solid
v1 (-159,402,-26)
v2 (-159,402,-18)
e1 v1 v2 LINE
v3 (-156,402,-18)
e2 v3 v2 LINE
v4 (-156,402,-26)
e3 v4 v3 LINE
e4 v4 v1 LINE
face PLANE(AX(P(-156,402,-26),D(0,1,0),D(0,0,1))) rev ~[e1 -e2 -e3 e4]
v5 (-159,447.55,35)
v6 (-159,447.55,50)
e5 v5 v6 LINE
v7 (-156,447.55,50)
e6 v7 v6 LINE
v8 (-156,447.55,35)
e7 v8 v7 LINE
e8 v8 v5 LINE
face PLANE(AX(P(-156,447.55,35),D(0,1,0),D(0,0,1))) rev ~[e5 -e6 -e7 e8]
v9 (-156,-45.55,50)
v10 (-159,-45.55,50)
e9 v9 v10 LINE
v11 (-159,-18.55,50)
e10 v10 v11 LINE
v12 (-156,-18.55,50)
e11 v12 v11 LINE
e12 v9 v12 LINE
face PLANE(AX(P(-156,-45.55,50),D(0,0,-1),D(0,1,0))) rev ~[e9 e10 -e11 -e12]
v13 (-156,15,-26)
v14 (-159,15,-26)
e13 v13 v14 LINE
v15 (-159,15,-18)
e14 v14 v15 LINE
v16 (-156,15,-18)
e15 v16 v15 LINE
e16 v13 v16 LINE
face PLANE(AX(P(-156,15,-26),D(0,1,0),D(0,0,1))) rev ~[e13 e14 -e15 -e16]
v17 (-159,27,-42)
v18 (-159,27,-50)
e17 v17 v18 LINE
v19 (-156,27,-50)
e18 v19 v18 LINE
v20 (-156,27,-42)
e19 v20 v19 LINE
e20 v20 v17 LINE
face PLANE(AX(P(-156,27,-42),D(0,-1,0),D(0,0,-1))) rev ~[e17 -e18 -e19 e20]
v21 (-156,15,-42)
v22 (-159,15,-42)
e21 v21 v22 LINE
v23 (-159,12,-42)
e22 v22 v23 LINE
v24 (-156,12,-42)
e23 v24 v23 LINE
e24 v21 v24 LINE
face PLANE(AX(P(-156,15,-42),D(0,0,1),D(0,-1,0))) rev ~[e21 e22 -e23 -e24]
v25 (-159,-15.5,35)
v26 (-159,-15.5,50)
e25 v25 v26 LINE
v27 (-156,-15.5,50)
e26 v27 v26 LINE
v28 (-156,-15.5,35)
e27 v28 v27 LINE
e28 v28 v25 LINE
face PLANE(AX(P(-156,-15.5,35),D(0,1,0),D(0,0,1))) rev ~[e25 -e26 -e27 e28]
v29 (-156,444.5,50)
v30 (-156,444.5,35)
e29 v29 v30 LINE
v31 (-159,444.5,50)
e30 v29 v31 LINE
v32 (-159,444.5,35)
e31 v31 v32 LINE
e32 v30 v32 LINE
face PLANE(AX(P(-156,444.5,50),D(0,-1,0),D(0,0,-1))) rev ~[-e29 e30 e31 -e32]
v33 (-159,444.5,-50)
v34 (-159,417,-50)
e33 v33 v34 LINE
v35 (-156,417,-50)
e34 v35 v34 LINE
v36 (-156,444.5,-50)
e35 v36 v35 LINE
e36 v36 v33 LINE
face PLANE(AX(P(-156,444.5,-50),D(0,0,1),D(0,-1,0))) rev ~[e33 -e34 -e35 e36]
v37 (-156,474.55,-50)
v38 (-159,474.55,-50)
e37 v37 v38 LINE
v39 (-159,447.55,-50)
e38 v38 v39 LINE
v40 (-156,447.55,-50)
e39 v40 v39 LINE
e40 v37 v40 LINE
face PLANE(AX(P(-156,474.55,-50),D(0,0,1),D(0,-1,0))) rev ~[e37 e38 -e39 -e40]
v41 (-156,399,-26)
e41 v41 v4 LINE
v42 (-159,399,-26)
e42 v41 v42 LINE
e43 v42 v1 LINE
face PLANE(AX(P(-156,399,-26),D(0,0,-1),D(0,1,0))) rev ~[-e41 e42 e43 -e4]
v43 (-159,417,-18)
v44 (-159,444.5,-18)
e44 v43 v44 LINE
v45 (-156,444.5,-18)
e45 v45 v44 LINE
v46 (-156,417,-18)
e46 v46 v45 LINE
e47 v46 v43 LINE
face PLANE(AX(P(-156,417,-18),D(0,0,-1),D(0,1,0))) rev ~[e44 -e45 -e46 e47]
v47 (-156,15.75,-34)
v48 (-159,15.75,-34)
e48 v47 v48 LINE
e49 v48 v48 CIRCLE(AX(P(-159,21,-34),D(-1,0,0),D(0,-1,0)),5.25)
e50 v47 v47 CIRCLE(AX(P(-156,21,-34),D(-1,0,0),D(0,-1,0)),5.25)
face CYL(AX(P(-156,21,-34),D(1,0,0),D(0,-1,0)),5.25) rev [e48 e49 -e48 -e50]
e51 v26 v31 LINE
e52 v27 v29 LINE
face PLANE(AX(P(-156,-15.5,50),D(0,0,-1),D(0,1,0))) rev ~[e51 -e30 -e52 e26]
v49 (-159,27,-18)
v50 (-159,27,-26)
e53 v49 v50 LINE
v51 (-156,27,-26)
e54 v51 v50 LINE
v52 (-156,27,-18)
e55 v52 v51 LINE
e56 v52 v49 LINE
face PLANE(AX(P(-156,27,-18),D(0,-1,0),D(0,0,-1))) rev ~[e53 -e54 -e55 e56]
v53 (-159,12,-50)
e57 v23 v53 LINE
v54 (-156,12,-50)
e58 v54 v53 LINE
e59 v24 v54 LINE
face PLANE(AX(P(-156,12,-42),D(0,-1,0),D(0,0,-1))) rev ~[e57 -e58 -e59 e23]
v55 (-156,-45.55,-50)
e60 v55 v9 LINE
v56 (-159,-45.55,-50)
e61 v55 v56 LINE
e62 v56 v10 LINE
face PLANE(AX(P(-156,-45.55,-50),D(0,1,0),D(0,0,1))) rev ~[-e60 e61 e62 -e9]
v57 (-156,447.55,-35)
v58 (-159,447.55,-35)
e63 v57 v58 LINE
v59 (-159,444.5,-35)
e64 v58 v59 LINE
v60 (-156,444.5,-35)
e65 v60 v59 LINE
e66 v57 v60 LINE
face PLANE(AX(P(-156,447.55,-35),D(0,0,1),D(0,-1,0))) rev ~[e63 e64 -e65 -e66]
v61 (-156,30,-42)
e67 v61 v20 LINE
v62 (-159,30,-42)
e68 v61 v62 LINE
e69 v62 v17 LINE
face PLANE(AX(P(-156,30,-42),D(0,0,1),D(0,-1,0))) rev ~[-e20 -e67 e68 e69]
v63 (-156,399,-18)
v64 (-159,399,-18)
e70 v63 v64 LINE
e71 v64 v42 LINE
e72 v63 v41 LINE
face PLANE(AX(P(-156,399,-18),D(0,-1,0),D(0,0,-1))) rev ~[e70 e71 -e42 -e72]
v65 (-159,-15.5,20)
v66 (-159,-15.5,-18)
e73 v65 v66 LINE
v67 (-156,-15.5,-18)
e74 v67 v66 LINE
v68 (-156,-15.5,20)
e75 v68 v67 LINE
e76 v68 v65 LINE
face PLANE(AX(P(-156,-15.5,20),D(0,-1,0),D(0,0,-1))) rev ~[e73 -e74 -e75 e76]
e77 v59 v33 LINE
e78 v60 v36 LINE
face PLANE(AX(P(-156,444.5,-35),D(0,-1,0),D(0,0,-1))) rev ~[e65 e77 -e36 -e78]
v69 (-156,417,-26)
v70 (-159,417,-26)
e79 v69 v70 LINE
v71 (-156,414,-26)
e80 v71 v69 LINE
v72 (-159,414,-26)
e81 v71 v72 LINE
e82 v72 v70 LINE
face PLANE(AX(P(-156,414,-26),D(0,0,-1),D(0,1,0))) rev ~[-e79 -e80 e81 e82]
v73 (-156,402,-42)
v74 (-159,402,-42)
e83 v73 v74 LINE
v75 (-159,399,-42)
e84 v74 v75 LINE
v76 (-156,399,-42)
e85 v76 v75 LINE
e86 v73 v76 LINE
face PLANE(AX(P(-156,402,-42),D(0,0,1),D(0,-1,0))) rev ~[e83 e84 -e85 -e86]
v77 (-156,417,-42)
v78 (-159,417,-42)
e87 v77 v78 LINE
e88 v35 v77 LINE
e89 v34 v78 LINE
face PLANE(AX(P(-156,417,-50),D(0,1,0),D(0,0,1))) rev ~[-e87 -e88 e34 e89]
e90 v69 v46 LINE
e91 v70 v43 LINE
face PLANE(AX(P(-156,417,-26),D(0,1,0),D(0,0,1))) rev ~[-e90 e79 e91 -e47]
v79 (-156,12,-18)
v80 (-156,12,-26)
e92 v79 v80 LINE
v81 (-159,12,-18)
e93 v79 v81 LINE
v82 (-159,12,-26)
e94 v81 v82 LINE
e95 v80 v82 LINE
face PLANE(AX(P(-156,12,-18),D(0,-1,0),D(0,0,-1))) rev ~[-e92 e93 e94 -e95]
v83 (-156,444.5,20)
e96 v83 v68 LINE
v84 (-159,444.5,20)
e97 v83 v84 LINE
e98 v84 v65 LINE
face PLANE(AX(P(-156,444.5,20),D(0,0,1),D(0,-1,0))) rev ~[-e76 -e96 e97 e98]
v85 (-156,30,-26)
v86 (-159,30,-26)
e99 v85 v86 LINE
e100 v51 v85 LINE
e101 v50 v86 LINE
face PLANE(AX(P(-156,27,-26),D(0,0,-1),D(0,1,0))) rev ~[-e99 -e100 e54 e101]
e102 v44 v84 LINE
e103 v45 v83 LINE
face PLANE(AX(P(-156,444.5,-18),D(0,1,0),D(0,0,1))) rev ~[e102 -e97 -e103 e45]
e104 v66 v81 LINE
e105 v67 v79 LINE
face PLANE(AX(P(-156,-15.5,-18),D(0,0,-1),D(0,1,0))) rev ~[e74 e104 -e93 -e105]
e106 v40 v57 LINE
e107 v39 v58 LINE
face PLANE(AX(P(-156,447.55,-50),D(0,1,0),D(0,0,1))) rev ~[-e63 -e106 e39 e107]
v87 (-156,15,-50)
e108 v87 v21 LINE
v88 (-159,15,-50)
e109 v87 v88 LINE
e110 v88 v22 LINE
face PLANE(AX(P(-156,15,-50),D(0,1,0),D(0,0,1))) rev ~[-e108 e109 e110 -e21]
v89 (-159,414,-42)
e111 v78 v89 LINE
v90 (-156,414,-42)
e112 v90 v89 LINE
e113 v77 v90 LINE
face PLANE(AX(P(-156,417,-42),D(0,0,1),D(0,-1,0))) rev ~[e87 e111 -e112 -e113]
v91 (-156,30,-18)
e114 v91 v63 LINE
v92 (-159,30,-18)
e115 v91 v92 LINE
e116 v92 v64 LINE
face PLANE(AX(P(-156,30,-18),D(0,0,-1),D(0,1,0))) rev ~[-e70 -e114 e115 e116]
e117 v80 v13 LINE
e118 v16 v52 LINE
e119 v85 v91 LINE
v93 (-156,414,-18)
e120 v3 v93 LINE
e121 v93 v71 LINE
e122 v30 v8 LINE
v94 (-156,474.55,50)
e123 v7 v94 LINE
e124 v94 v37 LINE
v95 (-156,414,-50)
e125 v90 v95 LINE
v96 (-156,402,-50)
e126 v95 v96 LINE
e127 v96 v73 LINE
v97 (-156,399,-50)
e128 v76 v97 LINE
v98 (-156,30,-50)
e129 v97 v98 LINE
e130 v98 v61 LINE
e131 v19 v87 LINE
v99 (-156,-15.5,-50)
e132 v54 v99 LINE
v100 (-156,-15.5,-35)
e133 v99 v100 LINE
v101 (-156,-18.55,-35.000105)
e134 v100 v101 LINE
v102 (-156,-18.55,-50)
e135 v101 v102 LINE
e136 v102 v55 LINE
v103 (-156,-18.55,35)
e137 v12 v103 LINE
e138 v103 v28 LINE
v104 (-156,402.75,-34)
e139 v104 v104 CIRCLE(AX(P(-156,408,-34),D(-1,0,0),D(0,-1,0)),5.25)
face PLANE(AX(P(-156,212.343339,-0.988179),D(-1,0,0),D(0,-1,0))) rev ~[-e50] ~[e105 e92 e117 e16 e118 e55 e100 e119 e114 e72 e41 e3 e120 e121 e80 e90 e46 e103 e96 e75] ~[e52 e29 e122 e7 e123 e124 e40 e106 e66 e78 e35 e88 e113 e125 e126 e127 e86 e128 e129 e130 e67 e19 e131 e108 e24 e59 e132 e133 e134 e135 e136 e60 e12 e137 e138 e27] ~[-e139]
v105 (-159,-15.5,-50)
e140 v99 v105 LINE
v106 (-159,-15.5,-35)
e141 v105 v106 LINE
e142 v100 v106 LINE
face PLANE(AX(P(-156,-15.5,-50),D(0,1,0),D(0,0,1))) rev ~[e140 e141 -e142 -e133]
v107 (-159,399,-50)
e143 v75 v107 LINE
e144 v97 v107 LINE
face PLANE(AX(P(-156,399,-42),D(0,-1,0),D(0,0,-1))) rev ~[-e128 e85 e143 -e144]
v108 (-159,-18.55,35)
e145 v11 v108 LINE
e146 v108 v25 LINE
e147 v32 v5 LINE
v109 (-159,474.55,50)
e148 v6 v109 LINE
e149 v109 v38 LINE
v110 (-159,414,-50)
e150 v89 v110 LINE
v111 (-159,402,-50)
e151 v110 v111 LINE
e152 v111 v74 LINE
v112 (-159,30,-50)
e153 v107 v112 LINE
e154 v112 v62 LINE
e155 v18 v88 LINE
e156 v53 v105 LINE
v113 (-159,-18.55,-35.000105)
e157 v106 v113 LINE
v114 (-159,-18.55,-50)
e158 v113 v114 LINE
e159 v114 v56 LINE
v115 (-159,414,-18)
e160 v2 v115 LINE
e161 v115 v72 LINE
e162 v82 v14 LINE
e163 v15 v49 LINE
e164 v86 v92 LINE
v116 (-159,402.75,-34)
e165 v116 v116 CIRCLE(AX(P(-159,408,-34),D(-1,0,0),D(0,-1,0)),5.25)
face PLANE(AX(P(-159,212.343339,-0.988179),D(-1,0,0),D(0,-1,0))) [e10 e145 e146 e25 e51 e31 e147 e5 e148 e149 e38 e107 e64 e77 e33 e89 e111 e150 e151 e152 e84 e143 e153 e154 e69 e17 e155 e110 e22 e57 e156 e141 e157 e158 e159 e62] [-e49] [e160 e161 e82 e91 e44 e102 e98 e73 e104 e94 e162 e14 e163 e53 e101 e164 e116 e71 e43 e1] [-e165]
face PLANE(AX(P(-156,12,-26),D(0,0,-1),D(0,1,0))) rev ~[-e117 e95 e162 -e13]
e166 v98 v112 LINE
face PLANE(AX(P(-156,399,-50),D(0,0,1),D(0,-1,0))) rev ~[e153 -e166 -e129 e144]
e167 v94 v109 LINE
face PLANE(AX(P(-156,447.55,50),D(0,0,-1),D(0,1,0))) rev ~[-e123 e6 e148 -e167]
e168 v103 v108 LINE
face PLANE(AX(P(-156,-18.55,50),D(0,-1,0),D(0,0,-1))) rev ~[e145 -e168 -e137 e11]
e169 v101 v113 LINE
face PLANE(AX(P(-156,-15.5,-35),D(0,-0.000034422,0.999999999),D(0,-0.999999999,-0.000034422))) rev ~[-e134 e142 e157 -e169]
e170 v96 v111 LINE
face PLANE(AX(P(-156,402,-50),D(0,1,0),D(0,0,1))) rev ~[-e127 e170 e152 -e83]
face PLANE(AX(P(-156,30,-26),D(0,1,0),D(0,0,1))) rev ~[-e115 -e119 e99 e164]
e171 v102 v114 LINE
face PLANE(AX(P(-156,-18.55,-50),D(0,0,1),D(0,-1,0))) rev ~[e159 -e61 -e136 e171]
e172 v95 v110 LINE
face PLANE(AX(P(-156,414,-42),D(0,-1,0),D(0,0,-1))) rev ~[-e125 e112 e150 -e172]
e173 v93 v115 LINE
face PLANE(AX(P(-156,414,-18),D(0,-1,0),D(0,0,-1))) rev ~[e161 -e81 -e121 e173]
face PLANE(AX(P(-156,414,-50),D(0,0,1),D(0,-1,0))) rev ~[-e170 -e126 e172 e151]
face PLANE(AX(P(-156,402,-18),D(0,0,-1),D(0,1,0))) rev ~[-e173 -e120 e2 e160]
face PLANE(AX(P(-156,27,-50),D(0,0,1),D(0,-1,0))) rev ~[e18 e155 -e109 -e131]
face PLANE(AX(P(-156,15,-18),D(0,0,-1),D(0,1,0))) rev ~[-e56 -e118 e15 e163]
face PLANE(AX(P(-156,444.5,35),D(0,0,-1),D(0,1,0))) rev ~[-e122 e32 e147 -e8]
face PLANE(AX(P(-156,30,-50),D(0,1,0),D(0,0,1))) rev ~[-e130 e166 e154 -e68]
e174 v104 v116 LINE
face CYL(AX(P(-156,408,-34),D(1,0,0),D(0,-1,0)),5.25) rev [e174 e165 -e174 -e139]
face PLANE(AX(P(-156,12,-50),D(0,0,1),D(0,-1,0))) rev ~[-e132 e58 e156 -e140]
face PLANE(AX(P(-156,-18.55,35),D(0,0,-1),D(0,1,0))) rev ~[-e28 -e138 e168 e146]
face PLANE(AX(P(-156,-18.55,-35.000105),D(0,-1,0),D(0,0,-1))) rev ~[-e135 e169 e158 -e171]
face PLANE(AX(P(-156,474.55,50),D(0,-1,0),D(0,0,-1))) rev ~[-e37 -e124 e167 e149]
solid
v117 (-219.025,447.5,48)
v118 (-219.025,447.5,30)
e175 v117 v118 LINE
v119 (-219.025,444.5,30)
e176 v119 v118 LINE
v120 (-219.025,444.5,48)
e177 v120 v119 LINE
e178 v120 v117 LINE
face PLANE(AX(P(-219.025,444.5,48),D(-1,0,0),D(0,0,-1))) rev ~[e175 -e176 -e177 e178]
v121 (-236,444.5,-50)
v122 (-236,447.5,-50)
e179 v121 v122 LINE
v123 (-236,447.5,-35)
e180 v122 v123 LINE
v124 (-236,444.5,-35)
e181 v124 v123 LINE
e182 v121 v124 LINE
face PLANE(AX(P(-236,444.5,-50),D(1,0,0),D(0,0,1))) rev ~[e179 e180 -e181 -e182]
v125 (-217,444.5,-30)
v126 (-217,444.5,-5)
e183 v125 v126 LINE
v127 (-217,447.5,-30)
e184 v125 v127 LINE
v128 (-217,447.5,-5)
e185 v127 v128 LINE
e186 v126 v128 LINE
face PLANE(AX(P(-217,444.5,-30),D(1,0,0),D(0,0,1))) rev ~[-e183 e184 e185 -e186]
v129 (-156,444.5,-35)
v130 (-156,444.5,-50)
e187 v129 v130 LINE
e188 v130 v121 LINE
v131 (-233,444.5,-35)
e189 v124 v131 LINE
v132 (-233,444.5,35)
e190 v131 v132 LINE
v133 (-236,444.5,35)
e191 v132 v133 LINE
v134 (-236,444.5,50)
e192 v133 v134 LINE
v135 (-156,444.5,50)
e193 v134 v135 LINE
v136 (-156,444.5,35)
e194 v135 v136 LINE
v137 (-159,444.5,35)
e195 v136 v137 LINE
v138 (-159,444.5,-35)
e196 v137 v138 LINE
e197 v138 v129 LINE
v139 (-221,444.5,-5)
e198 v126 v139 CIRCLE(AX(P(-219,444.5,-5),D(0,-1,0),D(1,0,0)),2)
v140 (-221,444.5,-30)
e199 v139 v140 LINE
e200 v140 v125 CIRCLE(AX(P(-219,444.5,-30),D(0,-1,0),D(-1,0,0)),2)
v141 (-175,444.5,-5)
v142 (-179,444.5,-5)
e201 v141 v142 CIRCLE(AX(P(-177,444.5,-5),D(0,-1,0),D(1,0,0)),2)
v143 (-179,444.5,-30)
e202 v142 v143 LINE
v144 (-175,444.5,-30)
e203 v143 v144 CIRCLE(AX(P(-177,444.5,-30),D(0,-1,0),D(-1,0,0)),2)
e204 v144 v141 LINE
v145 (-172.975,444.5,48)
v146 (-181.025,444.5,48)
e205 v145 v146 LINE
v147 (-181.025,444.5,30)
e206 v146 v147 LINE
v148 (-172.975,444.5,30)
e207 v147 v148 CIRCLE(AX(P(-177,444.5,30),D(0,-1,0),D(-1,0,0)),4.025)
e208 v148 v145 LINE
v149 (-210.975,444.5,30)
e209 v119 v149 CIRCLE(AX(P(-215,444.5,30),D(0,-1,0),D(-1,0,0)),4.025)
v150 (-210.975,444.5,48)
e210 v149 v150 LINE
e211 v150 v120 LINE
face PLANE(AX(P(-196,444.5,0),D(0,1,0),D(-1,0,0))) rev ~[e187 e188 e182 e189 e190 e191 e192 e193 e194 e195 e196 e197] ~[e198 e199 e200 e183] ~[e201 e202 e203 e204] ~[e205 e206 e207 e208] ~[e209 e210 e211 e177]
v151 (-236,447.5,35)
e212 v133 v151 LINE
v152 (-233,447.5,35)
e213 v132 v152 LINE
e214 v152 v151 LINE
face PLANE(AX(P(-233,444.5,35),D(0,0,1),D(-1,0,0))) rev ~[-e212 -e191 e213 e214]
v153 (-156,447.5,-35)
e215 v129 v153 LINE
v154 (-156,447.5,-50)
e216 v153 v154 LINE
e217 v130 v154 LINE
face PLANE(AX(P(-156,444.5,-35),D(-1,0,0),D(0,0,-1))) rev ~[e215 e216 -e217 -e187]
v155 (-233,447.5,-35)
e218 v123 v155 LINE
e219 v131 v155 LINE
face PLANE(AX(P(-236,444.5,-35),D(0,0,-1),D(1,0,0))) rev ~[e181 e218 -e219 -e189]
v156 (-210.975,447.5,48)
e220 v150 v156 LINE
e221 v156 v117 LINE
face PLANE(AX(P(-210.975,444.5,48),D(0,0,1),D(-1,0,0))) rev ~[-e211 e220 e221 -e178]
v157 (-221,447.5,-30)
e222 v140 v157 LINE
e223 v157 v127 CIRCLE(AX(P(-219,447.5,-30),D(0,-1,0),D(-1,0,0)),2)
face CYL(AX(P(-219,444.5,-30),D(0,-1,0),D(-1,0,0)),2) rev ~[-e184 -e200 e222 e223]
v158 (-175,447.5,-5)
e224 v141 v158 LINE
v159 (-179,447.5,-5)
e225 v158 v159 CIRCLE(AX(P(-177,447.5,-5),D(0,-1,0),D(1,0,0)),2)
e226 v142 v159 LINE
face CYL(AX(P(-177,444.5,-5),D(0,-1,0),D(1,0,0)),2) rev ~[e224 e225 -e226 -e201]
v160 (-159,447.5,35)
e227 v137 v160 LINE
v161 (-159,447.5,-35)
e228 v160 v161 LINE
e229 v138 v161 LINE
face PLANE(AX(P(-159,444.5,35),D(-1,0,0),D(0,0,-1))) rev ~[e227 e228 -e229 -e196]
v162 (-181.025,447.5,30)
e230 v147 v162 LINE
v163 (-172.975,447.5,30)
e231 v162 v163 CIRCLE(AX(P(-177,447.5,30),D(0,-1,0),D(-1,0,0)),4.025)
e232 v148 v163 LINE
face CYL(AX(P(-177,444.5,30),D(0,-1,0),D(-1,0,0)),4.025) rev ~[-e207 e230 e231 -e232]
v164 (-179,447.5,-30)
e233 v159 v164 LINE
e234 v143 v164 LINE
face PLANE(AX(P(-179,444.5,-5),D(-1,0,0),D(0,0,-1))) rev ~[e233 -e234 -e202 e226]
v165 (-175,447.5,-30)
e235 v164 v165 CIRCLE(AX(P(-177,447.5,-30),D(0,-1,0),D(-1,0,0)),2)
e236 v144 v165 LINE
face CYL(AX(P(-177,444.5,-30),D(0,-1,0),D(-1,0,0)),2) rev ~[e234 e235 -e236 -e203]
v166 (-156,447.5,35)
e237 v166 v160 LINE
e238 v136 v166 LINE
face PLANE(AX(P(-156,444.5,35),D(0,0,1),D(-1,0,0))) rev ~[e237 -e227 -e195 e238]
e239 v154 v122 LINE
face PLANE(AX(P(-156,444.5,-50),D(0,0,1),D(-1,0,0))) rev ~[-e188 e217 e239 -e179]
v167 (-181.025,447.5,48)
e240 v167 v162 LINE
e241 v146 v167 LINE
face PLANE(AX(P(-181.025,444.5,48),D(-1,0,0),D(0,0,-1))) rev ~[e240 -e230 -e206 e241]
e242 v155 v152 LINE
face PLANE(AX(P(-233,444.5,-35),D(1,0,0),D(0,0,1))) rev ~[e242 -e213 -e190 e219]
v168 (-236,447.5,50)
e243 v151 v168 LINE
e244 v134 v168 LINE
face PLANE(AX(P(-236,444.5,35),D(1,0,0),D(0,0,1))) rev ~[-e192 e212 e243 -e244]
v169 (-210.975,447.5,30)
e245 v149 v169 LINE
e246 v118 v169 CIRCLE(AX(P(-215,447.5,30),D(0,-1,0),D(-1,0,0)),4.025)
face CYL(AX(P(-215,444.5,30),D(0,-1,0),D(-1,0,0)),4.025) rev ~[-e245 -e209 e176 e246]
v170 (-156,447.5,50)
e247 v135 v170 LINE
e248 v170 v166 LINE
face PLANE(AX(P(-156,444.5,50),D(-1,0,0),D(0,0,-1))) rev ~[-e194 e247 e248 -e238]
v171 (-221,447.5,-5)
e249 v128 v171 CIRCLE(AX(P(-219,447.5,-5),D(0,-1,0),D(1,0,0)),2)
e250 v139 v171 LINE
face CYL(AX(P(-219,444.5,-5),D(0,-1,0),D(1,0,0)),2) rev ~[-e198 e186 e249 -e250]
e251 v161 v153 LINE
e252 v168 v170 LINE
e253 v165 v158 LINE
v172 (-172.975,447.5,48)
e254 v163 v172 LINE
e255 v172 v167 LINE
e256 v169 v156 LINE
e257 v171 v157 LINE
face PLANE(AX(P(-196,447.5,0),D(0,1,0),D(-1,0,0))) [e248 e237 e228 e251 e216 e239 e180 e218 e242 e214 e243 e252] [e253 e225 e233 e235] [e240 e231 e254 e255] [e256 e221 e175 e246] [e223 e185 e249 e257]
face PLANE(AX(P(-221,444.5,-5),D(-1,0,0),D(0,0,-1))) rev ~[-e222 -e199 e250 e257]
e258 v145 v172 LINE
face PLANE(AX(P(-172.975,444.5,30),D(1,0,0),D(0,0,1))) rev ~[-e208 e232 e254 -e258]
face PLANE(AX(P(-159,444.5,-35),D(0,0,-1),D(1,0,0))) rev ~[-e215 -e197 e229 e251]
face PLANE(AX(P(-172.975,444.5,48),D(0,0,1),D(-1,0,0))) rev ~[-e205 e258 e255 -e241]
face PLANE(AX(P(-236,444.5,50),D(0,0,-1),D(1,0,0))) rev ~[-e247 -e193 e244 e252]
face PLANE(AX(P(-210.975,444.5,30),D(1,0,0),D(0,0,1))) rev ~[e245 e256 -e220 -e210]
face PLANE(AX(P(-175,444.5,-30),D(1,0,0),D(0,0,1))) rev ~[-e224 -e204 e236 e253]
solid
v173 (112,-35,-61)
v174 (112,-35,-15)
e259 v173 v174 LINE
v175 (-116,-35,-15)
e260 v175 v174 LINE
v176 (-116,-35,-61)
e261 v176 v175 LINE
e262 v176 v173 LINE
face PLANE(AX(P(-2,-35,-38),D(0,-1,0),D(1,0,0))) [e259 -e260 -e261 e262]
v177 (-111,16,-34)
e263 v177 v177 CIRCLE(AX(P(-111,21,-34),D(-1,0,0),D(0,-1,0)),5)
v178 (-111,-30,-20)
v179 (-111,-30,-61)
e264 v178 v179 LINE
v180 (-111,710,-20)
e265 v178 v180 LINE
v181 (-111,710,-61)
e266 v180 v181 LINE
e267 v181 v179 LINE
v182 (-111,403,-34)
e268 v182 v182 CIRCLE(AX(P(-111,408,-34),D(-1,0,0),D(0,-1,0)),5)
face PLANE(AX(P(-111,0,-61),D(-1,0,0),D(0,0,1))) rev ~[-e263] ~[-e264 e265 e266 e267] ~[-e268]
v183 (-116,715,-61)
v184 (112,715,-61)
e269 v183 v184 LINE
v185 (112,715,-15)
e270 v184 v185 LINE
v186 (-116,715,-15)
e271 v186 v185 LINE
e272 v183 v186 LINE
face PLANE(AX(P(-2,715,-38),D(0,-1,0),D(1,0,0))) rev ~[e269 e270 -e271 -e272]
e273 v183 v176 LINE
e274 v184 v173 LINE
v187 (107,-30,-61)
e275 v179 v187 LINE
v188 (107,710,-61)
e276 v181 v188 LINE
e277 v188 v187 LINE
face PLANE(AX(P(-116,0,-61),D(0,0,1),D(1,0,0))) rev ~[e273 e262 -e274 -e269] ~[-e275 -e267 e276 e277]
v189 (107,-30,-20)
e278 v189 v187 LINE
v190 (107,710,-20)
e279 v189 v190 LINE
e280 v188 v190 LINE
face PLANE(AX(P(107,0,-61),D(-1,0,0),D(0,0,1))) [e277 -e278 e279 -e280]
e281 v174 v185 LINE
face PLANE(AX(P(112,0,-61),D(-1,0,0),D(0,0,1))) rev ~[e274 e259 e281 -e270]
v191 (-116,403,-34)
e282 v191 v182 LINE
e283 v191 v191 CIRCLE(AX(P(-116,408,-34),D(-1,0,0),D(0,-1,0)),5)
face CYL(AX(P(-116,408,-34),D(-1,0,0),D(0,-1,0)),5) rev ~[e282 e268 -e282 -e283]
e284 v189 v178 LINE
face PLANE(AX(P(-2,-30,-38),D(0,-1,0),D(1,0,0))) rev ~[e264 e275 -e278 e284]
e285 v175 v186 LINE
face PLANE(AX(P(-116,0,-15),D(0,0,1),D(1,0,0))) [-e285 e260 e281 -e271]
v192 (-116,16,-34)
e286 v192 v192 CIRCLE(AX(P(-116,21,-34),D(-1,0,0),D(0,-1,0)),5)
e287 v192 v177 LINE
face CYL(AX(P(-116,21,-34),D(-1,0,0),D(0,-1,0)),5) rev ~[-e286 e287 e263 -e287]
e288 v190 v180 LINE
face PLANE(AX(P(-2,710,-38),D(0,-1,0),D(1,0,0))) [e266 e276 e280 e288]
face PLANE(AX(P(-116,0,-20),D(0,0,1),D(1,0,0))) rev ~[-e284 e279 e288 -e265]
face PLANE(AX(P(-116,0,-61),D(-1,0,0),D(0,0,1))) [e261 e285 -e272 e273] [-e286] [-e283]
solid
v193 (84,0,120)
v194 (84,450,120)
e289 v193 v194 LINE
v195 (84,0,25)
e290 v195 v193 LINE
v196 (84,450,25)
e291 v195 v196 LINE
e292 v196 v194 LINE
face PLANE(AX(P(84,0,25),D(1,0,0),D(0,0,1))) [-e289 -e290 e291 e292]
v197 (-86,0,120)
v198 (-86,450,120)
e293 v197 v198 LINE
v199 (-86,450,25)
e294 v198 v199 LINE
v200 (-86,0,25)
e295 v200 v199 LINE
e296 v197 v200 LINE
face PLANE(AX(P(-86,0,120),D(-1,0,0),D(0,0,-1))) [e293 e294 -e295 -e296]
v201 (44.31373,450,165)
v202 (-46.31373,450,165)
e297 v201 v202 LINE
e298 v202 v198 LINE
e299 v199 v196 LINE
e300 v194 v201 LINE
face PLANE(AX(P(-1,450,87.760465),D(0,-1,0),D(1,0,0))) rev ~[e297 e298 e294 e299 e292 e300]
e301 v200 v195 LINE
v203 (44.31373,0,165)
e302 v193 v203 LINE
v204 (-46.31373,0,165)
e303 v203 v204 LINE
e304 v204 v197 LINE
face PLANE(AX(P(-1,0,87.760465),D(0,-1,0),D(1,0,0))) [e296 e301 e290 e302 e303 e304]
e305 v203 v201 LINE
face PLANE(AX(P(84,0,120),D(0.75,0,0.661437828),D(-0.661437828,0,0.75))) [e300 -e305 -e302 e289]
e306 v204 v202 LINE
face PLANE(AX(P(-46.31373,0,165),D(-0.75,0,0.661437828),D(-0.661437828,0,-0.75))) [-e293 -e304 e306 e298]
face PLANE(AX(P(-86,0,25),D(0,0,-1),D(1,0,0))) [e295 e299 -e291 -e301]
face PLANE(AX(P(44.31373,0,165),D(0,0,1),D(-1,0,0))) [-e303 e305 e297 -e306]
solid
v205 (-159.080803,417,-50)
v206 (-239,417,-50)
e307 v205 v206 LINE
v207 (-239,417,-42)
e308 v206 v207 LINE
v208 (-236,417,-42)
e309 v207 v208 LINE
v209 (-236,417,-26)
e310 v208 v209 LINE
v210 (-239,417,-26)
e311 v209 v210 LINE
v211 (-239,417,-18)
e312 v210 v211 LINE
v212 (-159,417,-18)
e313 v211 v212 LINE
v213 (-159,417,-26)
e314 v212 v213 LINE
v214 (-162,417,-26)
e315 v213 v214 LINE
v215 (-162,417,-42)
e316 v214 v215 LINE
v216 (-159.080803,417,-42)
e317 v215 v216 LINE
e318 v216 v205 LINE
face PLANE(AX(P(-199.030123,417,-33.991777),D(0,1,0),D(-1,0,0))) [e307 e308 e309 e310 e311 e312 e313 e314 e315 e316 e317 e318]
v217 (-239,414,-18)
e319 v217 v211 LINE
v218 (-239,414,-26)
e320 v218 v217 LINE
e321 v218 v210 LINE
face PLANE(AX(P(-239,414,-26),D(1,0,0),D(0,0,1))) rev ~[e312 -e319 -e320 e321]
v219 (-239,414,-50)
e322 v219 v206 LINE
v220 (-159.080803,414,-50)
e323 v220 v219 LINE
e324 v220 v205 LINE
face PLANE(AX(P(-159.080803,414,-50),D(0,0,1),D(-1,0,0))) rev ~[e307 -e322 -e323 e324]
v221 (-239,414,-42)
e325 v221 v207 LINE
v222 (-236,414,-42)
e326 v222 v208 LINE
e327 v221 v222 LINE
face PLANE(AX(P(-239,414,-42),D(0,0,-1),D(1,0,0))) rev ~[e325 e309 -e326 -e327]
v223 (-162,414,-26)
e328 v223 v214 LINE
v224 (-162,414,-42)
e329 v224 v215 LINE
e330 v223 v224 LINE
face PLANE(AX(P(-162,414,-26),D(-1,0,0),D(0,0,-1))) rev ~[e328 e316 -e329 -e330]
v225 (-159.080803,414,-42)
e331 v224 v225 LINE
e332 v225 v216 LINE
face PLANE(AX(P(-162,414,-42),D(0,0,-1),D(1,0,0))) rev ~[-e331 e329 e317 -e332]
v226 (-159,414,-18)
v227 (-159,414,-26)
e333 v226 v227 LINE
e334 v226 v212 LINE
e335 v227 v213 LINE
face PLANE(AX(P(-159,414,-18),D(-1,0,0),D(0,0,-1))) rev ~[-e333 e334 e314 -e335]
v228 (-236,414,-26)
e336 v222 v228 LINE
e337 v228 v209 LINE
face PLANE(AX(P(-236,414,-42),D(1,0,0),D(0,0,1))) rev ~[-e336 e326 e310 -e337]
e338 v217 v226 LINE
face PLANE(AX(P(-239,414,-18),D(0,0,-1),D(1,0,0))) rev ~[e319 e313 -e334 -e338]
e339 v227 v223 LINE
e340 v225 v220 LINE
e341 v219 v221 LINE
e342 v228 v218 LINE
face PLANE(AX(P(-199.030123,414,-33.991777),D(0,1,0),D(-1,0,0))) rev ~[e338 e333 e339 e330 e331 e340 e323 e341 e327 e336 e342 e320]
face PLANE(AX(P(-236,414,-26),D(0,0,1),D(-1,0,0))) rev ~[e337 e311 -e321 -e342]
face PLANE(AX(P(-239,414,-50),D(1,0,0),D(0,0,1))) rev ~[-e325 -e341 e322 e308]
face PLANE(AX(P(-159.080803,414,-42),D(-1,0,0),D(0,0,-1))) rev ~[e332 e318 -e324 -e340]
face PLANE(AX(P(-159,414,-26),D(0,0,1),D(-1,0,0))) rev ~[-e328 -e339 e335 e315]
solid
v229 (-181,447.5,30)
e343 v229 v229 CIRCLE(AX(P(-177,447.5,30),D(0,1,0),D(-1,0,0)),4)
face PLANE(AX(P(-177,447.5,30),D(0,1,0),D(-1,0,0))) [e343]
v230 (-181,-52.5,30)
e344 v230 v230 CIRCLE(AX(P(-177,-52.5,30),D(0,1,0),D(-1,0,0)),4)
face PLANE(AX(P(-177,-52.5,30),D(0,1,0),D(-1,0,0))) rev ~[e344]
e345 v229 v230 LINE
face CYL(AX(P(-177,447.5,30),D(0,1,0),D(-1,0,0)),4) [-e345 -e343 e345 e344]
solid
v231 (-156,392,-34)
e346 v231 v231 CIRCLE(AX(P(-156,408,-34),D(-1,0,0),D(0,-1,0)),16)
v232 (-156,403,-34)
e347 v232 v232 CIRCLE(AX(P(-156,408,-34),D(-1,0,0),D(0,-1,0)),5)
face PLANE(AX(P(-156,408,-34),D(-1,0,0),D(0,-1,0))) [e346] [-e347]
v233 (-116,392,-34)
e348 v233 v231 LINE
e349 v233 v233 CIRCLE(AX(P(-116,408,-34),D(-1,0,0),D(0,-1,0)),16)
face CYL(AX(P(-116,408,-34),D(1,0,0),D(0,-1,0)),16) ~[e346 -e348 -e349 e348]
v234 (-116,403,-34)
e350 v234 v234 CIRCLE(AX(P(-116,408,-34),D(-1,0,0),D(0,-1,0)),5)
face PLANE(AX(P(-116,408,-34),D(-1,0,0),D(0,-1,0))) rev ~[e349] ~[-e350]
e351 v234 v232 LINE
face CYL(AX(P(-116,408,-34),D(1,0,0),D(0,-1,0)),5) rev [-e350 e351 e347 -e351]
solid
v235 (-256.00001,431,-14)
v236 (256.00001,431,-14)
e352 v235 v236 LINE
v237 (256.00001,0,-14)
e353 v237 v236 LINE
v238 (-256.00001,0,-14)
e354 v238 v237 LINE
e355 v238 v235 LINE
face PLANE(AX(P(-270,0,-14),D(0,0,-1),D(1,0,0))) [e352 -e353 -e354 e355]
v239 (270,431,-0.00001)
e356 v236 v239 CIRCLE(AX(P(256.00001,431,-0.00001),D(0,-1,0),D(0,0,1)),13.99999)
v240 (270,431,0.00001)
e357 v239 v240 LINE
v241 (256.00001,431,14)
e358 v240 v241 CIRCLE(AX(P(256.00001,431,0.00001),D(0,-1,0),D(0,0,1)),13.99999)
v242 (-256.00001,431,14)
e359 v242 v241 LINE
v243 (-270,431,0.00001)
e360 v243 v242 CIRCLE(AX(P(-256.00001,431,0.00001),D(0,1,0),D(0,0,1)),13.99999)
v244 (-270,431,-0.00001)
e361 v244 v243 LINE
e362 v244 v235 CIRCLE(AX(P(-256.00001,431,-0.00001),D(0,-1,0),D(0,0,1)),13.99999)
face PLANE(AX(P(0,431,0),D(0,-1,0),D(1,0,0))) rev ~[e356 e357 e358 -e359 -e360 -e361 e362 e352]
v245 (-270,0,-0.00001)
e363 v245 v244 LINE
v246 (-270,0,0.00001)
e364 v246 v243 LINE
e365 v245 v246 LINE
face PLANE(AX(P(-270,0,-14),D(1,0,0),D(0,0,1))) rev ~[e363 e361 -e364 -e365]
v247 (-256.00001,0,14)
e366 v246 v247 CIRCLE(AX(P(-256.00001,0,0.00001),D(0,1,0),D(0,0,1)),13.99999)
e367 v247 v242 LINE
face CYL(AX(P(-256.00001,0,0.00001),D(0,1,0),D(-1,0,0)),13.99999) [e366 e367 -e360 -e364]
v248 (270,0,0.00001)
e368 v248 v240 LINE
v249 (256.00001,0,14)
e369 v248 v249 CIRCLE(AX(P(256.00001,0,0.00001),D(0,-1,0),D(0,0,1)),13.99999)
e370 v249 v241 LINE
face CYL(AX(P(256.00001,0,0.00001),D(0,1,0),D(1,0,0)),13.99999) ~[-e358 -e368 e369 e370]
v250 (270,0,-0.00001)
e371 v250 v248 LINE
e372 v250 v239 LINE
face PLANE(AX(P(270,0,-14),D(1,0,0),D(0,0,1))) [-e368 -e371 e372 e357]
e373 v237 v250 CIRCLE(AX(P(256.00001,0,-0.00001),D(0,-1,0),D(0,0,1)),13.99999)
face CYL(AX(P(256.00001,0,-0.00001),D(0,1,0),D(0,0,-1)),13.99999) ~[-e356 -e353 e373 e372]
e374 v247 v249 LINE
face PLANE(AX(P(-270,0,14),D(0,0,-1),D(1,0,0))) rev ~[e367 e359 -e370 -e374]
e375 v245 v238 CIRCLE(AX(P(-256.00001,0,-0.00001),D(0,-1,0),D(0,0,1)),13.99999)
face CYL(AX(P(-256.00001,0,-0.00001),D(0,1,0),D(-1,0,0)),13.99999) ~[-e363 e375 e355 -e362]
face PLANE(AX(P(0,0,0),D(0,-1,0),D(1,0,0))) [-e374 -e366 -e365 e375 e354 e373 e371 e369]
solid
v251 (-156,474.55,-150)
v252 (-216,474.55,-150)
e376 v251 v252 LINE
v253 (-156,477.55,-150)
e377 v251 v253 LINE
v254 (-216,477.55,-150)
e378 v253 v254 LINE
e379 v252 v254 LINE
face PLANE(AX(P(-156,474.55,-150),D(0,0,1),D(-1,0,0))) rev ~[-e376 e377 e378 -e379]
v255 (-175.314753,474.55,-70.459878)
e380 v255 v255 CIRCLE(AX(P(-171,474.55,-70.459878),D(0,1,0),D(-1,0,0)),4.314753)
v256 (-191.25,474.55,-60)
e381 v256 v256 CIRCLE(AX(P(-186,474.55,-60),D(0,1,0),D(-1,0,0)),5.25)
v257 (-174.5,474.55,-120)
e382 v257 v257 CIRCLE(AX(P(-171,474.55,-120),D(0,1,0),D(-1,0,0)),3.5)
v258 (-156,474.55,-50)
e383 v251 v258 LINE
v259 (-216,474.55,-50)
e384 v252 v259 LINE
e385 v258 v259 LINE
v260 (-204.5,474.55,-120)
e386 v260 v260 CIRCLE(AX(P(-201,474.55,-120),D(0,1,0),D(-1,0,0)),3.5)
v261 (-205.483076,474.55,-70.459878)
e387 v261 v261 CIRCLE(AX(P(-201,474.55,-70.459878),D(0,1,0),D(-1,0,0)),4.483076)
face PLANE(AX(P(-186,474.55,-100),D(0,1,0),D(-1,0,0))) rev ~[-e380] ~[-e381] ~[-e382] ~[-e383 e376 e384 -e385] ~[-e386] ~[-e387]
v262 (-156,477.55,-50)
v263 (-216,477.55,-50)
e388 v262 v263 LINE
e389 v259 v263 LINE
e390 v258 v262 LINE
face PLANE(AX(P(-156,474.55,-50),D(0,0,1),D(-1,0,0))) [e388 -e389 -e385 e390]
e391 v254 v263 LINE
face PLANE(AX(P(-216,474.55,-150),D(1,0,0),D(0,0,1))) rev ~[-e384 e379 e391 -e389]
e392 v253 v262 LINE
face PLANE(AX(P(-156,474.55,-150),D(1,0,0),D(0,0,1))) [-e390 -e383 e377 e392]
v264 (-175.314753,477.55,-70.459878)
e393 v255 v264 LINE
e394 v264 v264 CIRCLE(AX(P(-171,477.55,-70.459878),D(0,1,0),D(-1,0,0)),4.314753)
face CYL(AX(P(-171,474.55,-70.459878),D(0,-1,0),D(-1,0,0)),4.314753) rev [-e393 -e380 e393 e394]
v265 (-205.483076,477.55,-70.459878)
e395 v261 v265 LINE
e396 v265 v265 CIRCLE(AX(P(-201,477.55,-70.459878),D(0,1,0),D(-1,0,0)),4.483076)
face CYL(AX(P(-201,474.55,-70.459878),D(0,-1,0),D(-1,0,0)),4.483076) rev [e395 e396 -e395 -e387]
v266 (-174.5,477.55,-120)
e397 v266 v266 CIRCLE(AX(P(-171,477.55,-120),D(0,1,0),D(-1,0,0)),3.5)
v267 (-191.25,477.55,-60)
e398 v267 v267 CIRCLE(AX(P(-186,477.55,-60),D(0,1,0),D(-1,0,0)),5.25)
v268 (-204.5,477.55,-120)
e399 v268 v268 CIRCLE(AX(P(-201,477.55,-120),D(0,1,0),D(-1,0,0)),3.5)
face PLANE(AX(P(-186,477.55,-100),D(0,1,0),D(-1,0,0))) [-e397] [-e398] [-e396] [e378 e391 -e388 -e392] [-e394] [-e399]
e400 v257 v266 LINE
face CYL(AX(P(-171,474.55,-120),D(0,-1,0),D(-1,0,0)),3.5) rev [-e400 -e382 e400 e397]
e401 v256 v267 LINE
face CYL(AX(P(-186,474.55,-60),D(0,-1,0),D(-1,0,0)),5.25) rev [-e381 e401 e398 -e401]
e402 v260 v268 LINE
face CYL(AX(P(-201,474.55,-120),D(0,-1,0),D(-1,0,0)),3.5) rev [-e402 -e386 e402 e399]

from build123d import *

# Parameters (mm, degrees)
F0_W           = 540
F0_H           = 28
F1_DEPTH       = 431
F2_R           = 13.99999
F3_W           = 228
F3_H           = 46
F4_DEPTH       = 715
F4_DEPTH_BACK  = 35
F6_DEPTH       = 450
F7_R           = 12.5
F7_R_2         = 6
F8_DEPTH       = 400
F9_T           = -5
F10_R          = 5
F11_DEPTH      = 5
F12_R          = 16
F12_R_2        = 5
F13_DEPTH      = 40
F14_R          = 5.25
F15_DEPTH      = 3
F16_W          = 60
F16_H          = 100
F16_R          = 3.5
F16_R_2        = 4.3147526279
F16_R_3        = 5.25
F16_R_4        = 4.483075575
F17_DEPTH      = 3
F18_R          = 5.25
F18_R_2        = 4.25
F19_DEPTH      = 540
F19_DEPTH_BACK = 20
F21_DEPTH      = 3
F22_R          = 4
F23_DEPTH      = 500
F25_DEPTH      = 3


# Not quite as in the source:
# - a fillet or chamfer is up to 0.001 mm smaller than in the source, because OpenCascade refuses the exact size


with BuildPart() as f1:
    # F0 (on Front) → F1 (new body)
    with BuildSketch(Plane.XZ):
        Rectangle(F0_W, F0_H)
    extrude(amount=-F1_DEPTH)

    # F2 (radius 14 in the source; OpenCascade refuses exactly that, so slightly less here)
    f2_edges = [f1.edges().sort_by_distance(p)[0] for p in [
        (-270, 215.5, 14),
        (-270, 215.5, -14),
        (270, 215.5, 14),
        (270, 215.5, -14),
    ]]
    fillet(f2_edges, radius=F2_R)


with BuildPart() as f4:
    # F3 (on face) → F4 (new body, two sides)
    with BuildSketch(Plane.XZ) as f4_sk:
        with Locations((-2, -38)):
            Rectangle(F3_W, F3_H)
    extrude(amount=-F4_DEPTH)
    extrude(f4_sk.sketch, amount=F4_DEPTH_BACK)

    # F9
    f9_openings = [f4.faces().sort_by_distance(p)[0] for p in [
        (-2, 340, -61),
    ]]
    offset(amount=F9_T, openings=f9_openings)

    # F10 (on face) → F11 (cut)
    with BuildSketch(Plane(origin=(-116, 0, 0), x_dir=(0, -1, 0), z_dir=(-1, 0, 0))):
        with Locations((-21, -34)):
            Circle(F10_R)
        with Locations((-408, -34)):
            Circle(F10_R)
    extrude(amount=-F11_DEPTH, mode=Mode.SUBTRACT)


with BuildPart() as f6:
    # F5 (on Front) → F6 (new body)
    with BuildSketch(Plane.XZ):
        Polygon((44.313730334, 165), (-46.313730334, 165), (-86, 120), (-86, 25), (84, 25), (84, 120), align=None)
    extrude(amount=-F6_DEPTH)


with BuildPart() as f8:
    # F7 (on face) → F8 (new body)
    with BuildSketch(Plane.XZ):
        with Locations((-112.0508164167, 32.2285704315)):
            Circle(F7_R)
        with Locations((-112.0508164167, 32.2285704315)):
            Circle(F7_R_2, mode=Mode.SUBTRACT)
    extrude(amount=-F8_DEPTH)


with BuildPart() as f13:
    # F12 (on face) → F13 (new body)
    with BuildSketch(Plane(origin=(-116, 0, 0), x_dir=(0, -1, 0), z_dir=(-1, 0, 0))):
        with Locations((-408, -34)):
            Circle(F12_R)
        with Locations((-408, -34)):
            Circle(F12_R_2, mode=Mode.SUBTRACT)
    extrude(amount=F13_DEPTH)


with BuildPart() as f15:
    # F14 (on face) → F15 (new body)
    with BuildSketch(Plane(origin=(-156, 0, 0), x_dir=(0, -1, 0), z_dir=(-1, 0, 0))):
        with BuildLine():
            Line((-30, -18), (-214.5, -18))
            Line((-214.5, -18), (-399, -18))
            Line((-399, -18), (-399, -20.7712434447))
            ThreePointArc((-399, -20.7712434447), (-393.8578643763, -26.5166852265), (-392, -34))
            ThreePointArc((-392, -34), (-393.8578643763, -41.4833147735), (-399, -47.2287565553))
            Line((-399, -47.2287565553), (-399, -50))
            Line((-399, -50), (-214.5, -50))
            Line((-214.5, -50), (-30, -50))
            Line((-30, -50), (-30, -42))
            Line((-30, -42), (-27, -42))
            Line((-27, -42), (-27, -50))
            Line((-27, -50), (-15, -50))
            Line((-15, -50), (-15, -42))
            Line((-15, -42), (-12, -42))
            Line((-12, -42), (-12, -50))
            Line((-12, -50), (15.5, -50))
            Line((15.5, -50), (15.5, -35))
            Line((15.5, -35), (18.5499999982, -35.0001049883))
            Line((18.5499999982, -35.0001049883), (18.5499999982, -50))
            Line((18.5499999982, -50), (45.5499999982, -50))
            Line((45.5499999982, -50), (45.5499999982, 50))
            Line((45.5499999982, 50), (18.5499999982, 50))
            Line((18.5499999982, 50), (18.5499999982, 35))
            Line((18.5499999982, 35), (15.4999999982, 35))
            Line((15.4999999982, 35), (15.4999999982, 50))
            Line((15.4999999982, 50), (-444.4999999982, 50))
            Line((-444.4999999982, 50), (-444.4999999982, 35))
            Line((-444.4999999982, 35), (-447.5499999982, 35))
            Line((-447.5499999982, 35), (-447.5499999982, 50))
            Line((-447.5499999982, 50), (-474.5499999982, 50))
            Line((-474.5499999982, 50), (-474.5499999982, -50))
            Line((-474.5499999982, -50), (-447.5499999982, -50))
            Line((-447.5499999982, -50), (-447.5499999982, -35))
            Line((-447.5499999982, -35), (-444.4999999982, -35))
            Line((-444.4999999982, -35), (-444.4999999982, -50))
            Line((-444.4999999982, -50), (-417, -50))
            Line((-417, -50), (-417, -47.2287565553))
            ThreePointArc((-417, -47.2287565553), (-424, -34), (-417, -20.7712434447))
            Line((-417, -20.7712434447), (-417, -18))
            Line((-417, -18), (-444.5, -18))
            Line((-444.5, -18), (-444.5, 20))
            Line((-444.5, 20), (15.5, 20))
            Line((15.5, 20), (15.5, -18))
            Line((15.5, -18), (-12, -18))
            Line((-12, -18), (-12, -26))
            Line((-12, -26), (-15, -26))
            Line((-15, -26), (-15, -18))
            Line((-15, -18), (-27, -18))
            Line((-27, -18), (-27, -26))
            Line((-27, -26), (-30, -26))
            Line((-30, -26), (-30, -18))
        make_face()
        with Locations((-21, -34)):
            Circle(F14_R, mode=Mode.SUBTRACT)
        Polygon((-399, -50), (-214.5, -50), (-30, -50), (-30, -42), (-27, -42), (-27, -50), (-15, -50), (-15, -42), (-12, -42), (-12, -50), (15.5, -50), (15.5, -35), (18.5499999982, -35.0001049883), (18.5499999982, -50), (45.5499999982, -50), (45.5499999982, 50), (18.5499999982, 50), (18.5499999982, 35), (15.4999999982, 35), (15.4999999982, 50), (-444.4999999982, 50), (-444.4999999982, 35), (-447.5499999982, 35), (-447.5499999982, 50), (-474.5499999982, 50), (-474.5499999982, -50), (-447.5499999982, -50), (-447.5499999982, -35), (-444.4999999982, -35), (-444.4999999982, -50), (-417, -50), (-417, -42), (-414, -42), (-414, -50), (-402, -50), (-402, -42), (-399, -42), align=None)
        with Locations((-408, -34)):
            Circle(F14_R, mode=Mode.SUBTRACT)
        Polygon((-30, -18), (-214.5, -18), (-399, -18), (-399, -26), (-402, -26), (-402, -18), (-414, -18), (-414, -26), (-417, -26), (-417, -18), (-444.5, -18), (-444.5, 20), (15.5, 20), (15.5, -18), (-12, -18), (-12, -26), (-15, -26), (-15, -18), (-27, -18), (-27, -26), (-30, -26), align=None, mode=Mode.SUBTRACT)
        with Locations((-21, -34)):
            Circle(F14_R, mode=Mode.SUBTRACT)
    extrude(amount=F15_DEPTH)


with BuildPart() as f17:
    # F16 (on face) → F17 (new body)
    with BuildSketch(Plane(origin=(0, 474.5499999982, 0), x_dir=(-1, 0, 0), z_dir=(0, 1, 0))):
        with Locations((186, -100)):
            Rectangle(F16_W, F16_H)
        with Locations((171, -120)):
            Circle(F16_R, mode=Mode.SUBTRACT)
        with Locations((201, -120)):
            Circle(F16_R, mode=Mode.SUBTRACT)
        with Locations((171, -70.4598784447)):
            Circle(F16_R_2, mode=Mode.SUBTRACT)
        with Locations((186, -60)):
            Circle(F16_R_3, mode=Mode.SUBTRACT)
        with Locations((201, -70.4598784447)):
            Circle(F16_R_4, mode=Mode.SUBTRACT)
    extrude(amount=F17_DEPTH)


with BuildPart() as f19:
    # F18 (on face) → F19 (new body, two sides)
    with BuildSketch(Plane.XZ.offset(-474.5499999982)) as f19_sk:
        with Locations((-186, -60)):
            Circle(F18_R)
        with Locations((-186, -60)):
            Circle(F18_R_2, mode=Mode.SUBTRACT)
    extrude(amount=F19_DEPTH)
    extrude(f19_sk.sketch, amount=-F19_DEPTH_BACK)


with BuildPart() as f21:
    # F20 (on face) → F21 (new body)
    with BuildSketch(Plane(origin=(0, 444.4999999982, 0), x_dir=(-1, 0, 0), z_dir=(0, 1, 0))):
        Polygon((236, 50), (156, 50), (156, 35), (159, 35), (159, -35), (156, -35), (156, -50), (236, -50), (236, -35), (233, -35), (233, 35), (236, 35), align=None)
        with BuildLine():
            Line((179, -5), (179, -30))
            ThreePointArc((179, -30), (177, -32), (175, -30))
            Line((175, -30), (175, -5))
            ThreePointArc((175, -5), (177, -3), (179, -5))
        make_face(mode=Mode.SUBTRACT)
        with BuildLine():
            Line((221, -5), (221, -30))
            ThreePointArc((221, -30), (219, -32), (217, -30))
            Line((217, -30), (217, -5))
            ThreePointArc((217, -5), (219, -3), (221, -5))
        make_face(mode=Mode.SUBTRACT)
        with BuildLine():
            Line((172.975, 30), (172.975, 48))
            Line((172.975, 48), (181.025, 48))
            Line((181.025, 48), (181.025, 30))
            ThreePointArc((181.025, 30), (177, 25.975), (172.975, 30))
        make_face(mode=Mode.SUBTRACT)
        with BuildLine():
            Line((210.975, 30), (210.975, 48))
            Line((210.975, 48), (219.025, 48))
            Line((219.025, 48), (219.025, 30))
            ThreePointArc((219.025, 30), (215, 25.975), (210.975, 30))
        make_face(mode=Mode.SUBTRACT)
    extrude(amount=F21_DEPTH)


with BuildPart() as f23:
    # F22 (on face) → F23 (new body)
    with BuildSketch(Plane(origin=(0, 447.4999999982, 0), x_dir=(-1, 0, 0), z_dir=(0, 1, 0))):
        with Locations((177, 30)):
            Circle(F22_R)
    extrude(amount=-F23_DEPTH)


with BuildPart() as f25:
    # F24 (on face) → F25 (new body)
    with BuildSketch(Plane(origin=(0, 414, 0), x_dir=(-1, 0, 0), z_dir=(0, 1, 0))):
        Polygon((239, -18), (159, -18), (159, -26), (162, -26), (162, -42), (159.0808033943, -42), (159.0808033943, -50), (239, -50), (239, -42), (236, -42), (236, -26), (239, -26), align=None)
    extrude(amount=F25_DEPTH)


solid = Compound([f1.part, f4.part, f6.part, f13.part, f15.part, f17.part, f21.part, f23.part, f25.part])
